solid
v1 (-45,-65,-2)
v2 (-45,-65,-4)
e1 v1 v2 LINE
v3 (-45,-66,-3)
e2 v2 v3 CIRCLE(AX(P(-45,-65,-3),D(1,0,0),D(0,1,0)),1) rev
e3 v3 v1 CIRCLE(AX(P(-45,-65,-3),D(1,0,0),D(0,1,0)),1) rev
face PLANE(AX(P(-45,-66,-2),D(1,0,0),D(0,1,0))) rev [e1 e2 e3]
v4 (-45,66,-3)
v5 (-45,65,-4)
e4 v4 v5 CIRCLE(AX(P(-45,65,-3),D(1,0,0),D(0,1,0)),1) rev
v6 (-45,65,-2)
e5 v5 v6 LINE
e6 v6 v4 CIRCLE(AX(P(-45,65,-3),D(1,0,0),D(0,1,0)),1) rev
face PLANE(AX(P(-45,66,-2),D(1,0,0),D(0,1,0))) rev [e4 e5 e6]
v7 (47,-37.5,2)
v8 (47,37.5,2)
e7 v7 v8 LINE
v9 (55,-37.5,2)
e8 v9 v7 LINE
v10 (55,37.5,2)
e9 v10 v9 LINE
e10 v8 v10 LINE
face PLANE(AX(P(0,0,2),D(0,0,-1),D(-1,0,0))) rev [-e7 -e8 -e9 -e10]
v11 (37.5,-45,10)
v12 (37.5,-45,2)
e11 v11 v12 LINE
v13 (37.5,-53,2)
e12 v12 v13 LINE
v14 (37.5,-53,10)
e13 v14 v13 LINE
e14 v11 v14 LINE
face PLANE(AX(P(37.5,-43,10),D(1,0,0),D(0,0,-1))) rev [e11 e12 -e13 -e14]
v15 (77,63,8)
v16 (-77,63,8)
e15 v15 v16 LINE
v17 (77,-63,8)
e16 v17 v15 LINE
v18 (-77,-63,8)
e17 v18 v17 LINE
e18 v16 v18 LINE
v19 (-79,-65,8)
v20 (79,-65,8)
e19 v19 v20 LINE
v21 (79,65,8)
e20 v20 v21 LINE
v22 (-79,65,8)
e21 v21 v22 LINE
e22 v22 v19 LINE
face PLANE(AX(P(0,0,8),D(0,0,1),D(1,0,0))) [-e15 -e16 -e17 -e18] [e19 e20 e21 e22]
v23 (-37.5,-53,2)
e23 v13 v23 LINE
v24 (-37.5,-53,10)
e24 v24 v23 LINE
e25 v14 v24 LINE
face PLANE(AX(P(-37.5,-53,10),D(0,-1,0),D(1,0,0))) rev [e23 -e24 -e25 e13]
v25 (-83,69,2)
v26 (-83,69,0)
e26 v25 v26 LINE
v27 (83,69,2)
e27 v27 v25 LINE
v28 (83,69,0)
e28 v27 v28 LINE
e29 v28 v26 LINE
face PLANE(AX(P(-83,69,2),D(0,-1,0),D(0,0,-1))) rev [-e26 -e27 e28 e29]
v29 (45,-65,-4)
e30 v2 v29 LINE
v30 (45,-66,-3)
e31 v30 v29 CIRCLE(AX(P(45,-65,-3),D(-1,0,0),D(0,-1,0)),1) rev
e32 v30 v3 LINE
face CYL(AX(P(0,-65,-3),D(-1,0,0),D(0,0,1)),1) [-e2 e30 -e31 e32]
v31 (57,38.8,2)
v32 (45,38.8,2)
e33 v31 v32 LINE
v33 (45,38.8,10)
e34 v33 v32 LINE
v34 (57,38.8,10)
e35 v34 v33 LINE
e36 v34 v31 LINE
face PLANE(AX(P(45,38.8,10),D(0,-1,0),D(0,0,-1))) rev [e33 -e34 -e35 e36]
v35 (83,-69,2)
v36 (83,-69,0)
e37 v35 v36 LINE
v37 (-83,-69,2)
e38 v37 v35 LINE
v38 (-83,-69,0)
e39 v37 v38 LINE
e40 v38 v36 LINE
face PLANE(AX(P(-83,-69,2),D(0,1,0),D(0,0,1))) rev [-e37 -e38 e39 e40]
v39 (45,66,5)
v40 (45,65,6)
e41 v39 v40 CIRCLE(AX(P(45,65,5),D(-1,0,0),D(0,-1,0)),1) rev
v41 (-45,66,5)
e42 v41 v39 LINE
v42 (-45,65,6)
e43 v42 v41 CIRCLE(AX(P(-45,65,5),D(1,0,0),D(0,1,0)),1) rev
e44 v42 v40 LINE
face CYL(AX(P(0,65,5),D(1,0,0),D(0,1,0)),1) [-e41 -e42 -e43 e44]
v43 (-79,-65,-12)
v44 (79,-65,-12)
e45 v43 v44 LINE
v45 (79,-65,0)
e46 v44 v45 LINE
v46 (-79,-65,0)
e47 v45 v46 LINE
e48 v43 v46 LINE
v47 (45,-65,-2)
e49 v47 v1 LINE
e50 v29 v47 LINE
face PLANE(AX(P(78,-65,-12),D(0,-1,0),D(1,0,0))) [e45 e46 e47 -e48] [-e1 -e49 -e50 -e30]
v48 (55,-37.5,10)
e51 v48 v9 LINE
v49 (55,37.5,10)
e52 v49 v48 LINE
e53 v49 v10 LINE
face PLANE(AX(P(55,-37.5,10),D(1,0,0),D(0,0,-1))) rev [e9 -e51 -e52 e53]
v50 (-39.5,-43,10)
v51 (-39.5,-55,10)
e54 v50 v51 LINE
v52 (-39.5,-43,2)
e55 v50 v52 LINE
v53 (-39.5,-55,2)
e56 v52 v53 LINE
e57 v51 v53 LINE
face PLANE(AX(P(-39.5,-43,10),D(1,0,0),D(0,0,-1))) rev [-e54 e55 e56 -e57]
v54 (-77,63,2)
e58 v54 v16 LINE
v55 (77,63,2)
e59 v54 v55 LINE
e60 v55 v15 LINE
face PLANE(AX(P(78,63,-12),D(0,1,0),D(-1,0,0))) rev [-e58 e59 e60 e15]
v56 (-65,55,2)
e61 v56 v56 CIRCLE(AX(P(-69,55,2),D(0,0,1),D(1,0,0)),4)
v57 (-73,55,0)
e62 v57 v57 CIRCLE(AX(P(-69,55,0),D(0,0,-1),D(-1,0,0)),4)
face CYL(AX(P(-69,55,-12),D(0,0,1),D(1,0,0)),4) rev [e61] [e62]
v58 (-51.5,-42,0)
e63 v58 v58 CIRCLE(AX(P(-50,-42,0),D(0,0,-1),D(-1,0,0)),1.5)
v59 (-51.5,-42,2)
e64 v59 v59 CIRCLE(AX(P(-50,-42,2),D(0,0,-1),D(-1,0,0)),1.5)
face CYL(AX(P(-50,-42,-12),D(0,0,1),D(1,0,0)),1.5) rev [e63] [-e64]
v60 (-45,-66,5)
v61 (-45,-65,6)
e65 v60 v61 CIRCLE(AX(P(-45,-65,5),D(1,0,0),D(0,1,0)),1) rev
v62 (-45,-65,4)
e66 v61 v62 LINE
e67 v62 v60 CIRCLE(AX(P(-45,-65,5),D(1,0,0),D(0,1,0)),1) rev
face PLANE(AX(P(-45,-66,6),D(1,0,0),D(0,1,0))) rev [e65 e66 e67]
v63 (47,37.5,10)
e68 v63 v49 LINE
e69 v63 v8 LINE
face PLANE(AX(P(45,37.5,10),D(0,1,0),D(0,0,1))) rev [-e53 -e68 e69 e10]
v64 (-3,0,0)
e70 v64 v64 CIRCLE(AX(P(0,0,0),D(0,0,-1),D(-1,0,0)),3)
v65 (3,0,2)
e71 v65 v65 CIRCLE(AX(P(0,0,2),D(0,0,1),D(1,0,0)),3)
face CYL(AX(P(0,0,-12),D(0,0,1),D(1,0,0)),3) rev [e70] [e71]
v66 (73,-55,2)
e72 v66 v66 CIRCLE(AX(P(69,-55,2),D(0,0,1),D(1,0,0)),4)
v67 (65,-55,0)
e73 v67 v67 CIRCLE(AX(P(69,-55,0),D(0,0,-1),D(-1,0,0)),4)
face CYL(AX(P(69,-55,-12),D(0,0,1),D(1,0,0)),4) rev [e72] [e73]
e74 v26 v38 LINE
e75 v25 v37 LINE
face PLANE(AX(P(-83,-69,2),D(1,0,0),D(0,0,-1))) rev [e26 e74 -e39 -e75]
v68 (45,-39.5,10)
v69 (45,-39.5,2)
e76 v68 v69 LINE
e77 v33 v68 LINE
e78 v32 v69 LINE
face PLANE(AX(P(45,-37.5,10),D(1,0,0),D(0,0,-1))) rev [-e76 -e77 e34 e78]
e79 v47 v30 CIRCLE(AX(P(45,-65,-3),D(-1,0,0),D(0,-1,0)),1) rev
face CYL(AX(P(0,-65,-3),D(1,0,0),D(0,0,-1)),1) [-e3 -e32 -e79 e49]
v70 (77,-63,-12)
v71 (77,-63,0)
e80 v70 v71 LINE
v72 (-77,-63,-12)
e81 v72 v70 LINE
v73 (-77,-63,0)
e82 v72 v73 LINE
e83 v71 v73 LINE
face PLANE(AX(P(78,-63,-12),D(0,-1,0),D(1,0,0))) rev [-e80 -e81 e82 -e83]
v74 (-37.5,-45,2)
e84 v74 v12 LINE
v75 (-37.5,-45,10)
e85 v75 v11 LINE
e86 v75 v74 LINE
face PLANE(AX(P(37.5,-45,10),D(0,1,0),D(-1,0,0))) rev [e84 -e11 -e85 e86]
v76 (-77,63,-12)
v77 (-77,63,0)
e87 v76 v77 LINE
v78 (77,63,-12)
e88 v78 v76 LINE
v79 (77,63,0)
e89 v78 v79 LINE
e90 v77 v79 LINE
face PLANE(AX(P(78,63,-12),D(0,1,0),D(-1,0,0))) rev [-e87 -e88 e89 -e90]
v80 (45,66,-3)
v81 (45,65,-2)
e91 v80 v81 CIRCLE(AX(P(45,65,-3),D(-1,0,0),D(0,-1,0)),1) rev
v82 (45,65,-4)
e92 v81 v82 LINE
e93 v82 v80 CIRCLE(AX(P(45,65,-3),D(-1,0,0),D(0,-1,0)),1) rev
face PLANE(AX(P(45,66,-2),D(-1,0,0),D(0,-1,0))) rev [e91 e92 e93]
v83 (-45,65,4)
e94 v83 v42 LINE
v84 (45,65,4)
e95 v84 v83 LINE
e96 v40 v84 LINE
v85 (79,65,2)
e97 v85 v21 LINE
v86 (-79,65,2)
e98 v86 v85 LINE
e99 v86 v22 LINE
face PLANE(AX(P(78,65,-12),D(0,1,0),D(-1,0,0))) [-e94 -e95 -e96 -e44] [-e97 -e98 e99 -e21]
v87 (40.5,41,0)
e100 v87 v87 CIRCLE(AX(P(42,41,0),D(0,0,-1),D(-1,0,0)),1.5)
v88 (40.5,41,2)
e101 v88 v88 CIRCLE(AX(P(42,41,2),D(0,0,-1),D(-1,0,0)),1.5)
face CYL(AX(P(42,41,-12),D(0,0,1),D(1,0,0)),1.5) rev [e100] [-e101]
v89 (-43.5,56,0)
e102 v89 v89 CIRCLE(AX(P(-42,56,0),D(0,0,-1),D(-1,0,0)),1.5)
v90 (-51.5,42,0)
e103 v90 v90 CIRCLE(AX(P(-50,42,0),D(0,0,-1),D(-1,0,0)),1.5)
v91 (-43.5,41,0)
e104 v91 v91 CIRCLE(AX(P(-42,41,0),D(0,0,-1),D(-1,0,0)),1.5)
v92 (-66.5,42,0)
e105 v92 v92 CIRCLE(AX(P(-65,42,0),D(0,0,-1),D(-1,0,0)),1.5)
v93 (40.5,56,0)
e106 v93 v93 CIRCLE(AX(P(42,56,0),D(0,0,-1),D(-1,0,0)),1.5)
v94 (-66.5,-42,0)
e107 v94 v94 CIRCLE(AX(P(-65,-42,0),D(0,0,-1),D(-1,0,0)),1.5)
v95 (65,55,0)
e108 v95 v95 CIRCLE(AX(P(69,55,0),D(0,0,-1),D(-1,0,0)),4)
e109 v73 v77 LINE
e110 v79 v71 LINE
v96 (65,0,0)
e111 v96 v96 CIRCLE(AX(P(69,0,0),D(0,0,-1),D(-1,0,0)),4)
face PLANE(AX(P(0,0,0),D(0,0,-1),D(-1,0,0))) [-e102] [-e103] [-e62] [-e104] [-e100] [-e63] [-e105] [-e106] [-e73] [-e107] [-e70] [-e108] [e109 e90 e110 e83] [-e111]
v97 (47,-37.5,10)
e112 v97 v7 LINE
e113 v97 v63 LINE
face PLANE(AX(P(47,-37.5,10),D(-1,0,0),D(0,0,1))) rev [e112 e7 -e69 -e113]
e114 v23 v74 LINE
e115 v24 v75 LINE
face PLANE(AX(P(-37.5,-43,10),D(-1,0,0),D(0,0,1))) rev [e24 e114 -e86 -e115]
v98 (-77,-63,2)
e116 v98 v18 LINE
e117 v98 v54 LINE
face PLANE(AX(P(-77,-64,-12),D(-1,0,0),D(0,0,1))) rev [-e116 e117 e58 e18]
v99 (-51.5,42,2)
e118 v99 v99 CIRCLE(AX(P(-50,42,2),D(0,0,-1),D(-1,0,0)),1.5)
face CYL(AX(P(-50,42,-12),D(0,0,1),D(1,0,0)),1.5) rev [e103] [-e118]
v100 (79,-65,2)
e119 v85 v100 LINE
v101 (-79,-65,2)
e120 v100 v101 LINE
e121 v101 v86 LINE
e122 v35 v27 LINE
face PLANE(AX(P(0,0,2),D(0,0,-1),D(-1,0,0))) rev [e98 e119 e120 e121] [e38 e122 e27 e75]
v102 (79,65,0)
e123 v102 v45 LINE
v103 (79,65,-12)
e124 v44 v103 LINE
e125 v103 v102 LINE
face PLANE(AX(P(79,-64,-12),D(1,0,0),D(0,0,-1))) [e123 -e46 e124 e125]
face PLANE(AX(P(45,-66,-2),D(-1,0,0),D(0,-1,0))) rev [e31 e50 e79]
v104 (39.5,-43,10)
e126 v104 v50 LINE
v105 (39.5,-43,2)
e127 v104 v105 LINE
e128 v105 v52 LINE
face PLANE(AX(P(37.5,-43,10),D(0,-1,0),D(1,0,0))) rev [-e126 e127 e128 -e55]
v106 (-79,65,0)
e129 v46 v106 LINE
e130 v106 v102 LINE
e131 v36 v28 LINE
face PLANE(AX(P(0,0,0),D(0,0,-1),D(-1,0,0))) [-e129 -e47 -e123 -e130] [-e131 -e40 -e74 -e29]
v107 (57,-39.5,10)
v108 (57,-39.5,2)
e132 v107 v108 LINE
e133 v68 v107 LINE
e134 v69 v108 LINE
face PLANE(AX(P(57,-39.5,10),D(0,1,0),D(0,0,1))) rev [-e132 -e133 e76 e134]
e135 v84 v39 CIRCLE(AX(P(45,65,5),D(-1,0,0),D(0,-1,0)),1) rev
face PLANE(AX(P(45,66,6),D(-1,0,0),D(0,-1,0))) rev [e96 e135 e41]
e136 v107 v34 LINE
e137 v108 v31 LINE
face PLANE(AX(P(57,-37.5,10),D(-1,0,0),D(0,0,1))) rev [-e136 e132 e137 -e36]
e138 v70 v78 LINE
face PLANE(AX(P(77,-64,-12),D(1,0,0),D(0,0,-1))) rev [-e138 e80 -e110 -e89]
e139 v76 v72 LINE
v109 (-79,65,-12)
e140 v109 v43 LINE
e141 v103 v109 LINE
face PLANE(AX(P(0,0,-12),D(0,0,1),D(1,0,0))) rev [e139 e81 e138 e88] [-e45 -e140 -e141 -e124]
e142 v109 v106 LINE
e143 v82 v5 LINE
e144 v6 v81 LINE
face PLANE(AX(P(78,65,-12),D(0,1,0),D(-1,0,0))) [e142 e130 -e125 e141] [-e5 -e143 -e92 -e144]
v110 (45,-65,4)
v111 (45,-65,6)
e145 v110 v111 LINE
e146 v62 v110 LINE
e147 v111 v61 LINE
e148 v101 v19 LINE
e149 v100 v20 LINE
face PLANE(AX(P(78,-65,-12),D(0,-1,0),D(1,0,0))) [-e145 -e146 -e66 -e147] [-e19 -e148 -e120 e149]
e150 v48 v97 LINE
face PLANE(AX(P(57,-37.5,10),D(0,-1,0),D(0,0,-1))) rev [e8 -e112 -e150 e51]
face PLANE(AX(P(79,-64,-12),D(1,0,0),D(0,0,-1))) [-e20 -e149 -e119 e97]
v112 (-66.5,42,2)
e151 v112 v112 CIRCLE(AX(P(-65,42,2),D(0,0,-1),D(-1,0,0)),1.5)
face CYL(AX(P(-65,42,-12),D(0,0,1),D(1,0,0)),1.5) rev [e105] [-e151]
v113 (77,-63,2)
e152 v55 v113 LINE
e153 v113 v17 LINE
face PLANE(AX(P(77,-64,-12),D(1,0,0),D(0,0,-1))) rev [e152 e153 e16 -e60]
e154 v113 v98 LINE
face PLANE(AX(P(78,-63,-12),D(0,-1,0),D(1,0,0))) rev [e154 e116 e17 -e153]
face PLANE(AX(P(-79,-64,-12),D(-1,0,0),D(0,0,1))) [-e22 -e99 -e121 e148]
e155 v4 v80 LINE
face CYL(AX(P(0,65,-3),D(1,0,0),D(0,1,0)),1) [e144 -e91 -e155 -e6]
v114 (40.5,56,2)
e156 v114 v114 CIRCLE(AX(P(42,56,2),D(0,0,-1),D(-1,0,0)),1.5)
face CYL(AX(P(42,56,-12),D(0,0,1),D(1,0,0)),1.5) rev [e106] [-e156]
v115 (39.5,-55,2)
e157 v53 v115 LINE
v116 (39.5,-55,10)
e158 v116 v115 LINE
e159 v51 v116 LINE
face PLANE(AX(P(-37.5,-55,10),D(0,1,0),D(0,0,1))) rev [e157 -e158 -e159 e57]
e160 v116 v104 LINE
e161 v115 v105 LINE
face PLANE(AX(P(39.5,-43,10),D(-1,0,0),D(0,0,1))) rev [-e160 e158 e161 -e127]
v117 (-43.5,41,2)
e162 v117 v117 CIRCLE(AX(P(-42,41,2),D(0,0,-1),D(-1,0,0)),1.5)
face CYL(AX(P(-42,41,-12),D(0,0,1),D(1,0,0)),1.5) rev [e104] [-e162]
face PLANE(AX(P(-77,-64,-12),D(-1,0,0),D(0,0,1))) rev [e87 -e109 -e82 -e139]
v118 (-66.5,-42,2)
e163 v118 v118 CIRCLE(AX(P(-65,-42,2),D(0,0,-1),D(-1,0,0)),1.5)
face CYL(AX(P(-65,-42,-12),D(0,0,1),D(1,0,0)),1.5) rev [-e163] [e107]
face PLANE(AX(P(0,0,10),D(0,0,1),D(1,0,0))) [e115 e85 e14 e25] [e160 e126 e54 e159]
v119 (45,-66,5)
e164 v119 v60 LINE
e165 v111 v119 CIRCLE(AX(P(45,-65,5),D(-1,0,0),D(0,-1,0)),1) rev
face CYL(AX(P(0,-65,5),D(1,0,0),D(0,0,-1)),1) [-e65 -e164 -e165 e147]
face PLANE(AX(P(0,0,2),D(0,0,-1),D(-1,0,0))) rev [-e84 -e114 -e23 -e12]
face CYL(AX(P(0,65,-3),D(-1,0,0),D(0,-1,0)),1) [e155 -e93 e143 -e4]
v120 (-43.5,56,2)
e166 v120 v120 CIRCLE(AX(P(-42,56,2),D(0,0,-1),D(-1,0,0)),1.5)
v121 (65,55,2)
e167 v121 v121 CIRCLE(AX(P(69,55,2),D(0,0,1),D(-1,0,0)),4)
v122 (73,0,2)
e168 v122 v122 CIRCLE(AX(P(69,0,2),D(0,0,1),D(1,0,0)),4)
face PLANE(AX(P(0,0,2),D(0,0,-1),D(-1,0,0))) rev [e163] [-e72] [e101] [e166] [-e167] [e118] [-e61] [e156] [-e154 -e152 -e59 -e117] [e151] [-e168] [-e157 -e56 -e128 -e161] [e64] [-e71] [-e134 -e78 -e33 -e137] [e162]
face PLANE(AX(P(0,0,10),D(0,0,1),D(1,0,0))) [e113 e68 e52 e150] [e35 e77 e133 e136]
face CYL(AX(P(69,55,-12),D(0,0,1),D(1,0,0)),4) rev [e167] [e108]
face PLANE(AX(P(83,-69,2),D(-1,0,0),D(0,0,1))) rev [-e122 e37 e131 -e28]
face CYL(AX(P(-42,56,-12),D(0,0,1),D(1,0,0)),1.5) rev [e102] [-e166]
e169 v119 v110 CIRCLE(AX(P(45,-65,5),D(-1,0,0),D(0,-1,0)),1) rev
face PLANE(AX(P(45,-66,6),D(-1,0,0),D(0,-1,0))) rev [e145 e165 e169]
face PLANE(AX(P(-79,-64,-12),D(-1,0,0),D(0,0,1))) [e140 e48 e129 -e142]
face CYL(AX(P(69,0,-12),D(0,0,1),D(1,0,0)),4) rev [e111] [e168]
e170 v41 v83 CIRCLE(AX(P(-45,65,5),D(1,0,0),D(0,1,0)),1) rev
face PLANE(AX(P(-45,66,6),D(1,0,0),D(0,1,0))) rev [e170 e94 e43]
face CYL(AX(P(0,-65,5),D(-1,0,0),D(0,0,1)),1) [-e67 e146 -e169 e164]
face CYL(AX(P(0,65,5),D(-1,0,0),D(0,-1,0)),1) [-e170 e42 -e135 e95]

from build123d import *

# Parameters (mm, degrees)
SKETCH_1_W                     = 166
SKETCH_1_H                     = 138
EXTRUDE_1_DEPTH                = 2
EXTRUDE_2_DEPTH                = 6
EXTRUDE_2_DEPTH_BACK           = 14
SKETCH_2_W                     = 158
SKETCH_2_H                     = 130
SKETCH_2_W_2                   = 154
SKETCH_2_H_2                   = 126
SKETCH_3_R                     = 1.5
EXTRUDE_2_2_DEPTH              = 5
SKETCH_5_R                     = 1.5
EXTRUDE_3_DEPTH                = 5
SKETCH_4_R                     = 1.5
EXTRUDE_4_DEPTH                = 5
SKETCH_6_W                     = 75
SKETCH_6_H                     = 2
SKETCH_6_W_2                   = 2
SKETCH_6_H_2                   = 75
EXTRUDE_5_DEPTH                = 8
SKETCH_9_W                     = 90
SKETCH_9_H                     = 2
EXTRUDE_6_DEPTH                = 1
FILLET_1_R                     = 1
SKETCH_11_W                    = 90
SKETCH_11_H                    = 2
EXTRUDE_7_DEPTH                = 1
FILLET_2_R                     = 1
PATTERN_LINEAR_1_COUNT         = 2
PATTERN_LINEAR_1_PITCH         = 8
FILLET_1_OF_PATTERN_LINEAR_1_R = 1
PATTERN_LINEAR_2_COUNT         = 2
PATTERN_LINEAR_2_PITCH         = 8
FILLET_2_OF_PATTERN_LINEAR_2_R = 1
SKETCH_12_W                    = 2
SKETCH_12_H                    = 12
SKETCH_12_W_2                  = 12
SKETCH_12_H_2                  = 2
SKETCH_12_H_3                  = 1.3
EXTRUDE_8_DEPTH                = 8
CUT_EXTRUDE_2_DEPTH            = 109.839331126
CUT_EXTRUDE_2_DEPTH_BACK       = 109.839331126
SKETCH_5_4_R                   = 1.5
CUT_EXTRUDE_3_DEPTH            = 109.839331126
CUT_EXTRUDE_3_DEPTH_BACK       = 109.839331126
SKETCH_4_3_R                   = 1.5
CUT_EXTRUDE_4_DEPTH            = 109.839331126
CUT_EXTRUDE_4_DEPTH_BACK       = 109.839331126
SKETCH_3_2_R                   = 1.5
SKETCH_13_R                    = 3
SKETCH_13_R_2                  = 4
CUT_EXTRUDE_5_DEPTH            = 109.839331126


with BuildPart() as part:
    # 스케치1 → 보스-돌출1 (new body)
    with BuildSketch(Plane.XY):
        Rectangle(SKETCH_1_W, SKETCH_1_H)
    extrude(amount=EXTRUDE_1_DEPTH)

    # 스케치2 → Extrude 2 (add, two sides: drawn at the far end of the back side and taken through both)
    with BuildSketch(Plane.XY.offset(2).offset(-EXTRUDE_2_DEPTH_BACK)):
        Rectangle(SKETCH_2_W, SKETCH_2_H)
        Rectangle(SKETCH_2_W_2, SKETCH_2_H_2, mode=Mode.SUBTRACT)
    extrude(amount=EXTRUDE_2_DEPTH + EXTRUDE_2_DEPTH_BACK)

    # 스케치3 → Extrude 2 2 (add)
    with BuildSketch(Plane.XY.offset(2)):
        with Locations(Location((-65, -42, 0), (0, 0, 180))):
            Circle(SKETCH_3_R)
        with Locations(Location((-50, -42, 0), (0, 0, 180))):
            Circle(SKETCH_3_R)
        with Locations(Location((-65, 42, 0), (0, 0, 180))):
            Circle(SKETCH_3_R)
        with Locations(Location((-50, 42, 0), (0, 0, 180))):
            Circle(SKETCH_3_R)
    extrude(amount=EXTRUDE_2_2_DEPTH)

    # 스케치5 → 보스-돌출3 (add)
    with BuildSketch(Plane.XY.offset(2)):
        with Locations(Location((42, 56, 0), (0, 0, 180))):
            Circle(SKETCH_5_R)
        with Locations(Location((42, 41, 0), (0, 0, 180))):
            Circle(SKETCH_5_R)
    extrude(amount=EXTRUDE_3_DEPTH)

    # 스케치4 → 보스-돌출4 (add)
    with BuildSketch(Plane.XY.offset(2)):
        with Locations(Location((-42, 56, 0), (0, 0, 180))):
            Circle(SKETCH_4_R)
        with Locations(Location((-42, 41, 0), (0, 0, 180))):
            Circle(SKETCH_4_R)
    extrude(amount=EXTRUDE_4_DEPTH)

    # 스케치6 → 보스-돌출5 (add)
    with BuildSketch(Plane.XY.offset(2)):
        with Locations((0, -54)):
            Rectangle(SKETCH_6_W, SKETCH_6_H)
        with Locations((0, -44)):
            Rectangle(SKETCH_6_W, SKETCH_6_H)
        with Locations((46, 0)):
            Rectangle(SKETCH_6_W_2, SKETCH_6_H_2)
        with Locations((56, 0)):
            Rectangle(SKETCH_6_W_2, SKETCH_6_H_2)
    extrude(amount=EXTRUDE_5_DEPTH)

    # 스케치9 → 보스-돌출6 (add)
    with BuildSketch(Plane.XZ.offset(65)):
        with Locations((0, 5)):
            Rectangle(SKETCH_9_W, SKETCH_9_H)
    extrude_6 = extrude(amount=EXTRUDE_6_DEPTH)

    # 필렛1
    fillet_1_edges = [part.edges().sort_by_distance(p)[0] for p in [
        (0, -66, 4),
        (0, -66, 6),
    ]]
    fillet(fillet_1_edges, radius=FILLET_1_R - 0.0001)  # a hair under: the kernel refuses the full size

    # 스케치11 → 보스-돌출7 (add)
    with BuildSketch(Plane(origin=(0, 65, 0), x_dir=(1, 0, 0), z_dir=(0, 1, 0))):
        with Locations((0, -5)):
            Rectangle(SKETCH_11_W, SKETCH_11_H)
    extrude_7 = extrude(amount=EXTRUDE_7_DEPTH)

    # 필렛2
    fillet_2_edges = [part.edges().sort_by_distance(p)[0] for p in [
        (0, 66, 4),
        (0, 66, 6),
    ]]
    fillet(fillet_2_edges, radius=FILLET_2_R - 0.0001)  # a hair under: the kernel refuses the full size

    # 선형 패턴1: 보스-돌출6 ×2
    with Locations(*[(0, 0, -i * PATTERN_LINEAR_1_PITCH) for i in range(1, PATTERN_LINEAR_1_COUNT)]):
        add(extrude_6)

    # 필렛1 of 선형 패턴1
    fillet_1_of_pattern_linear_1_edges = [part.edges().sort_by_distance(p)[0] for p in [
        (0, -66, -4),
        (0, -66, -2),
    ]]
    fillet(fillet_1_of_pattern_linear_1_edges, radius=FILLET_1_OF_PATTERN_LINEAR_1_R - 0.0001)  # a hair under: the kernel refuses the full size

    # 선형 패턴2: 보스-돌출7 ×2
    with Locations(*[(0, 0, -i * PATTERN_LINEAR_2_PITCH) for i in range(1, PATTERN_LINEAR_2_COUNT)]):
        add(extrude_7)

    # 필렛2 of 선형 패턴2
    fillet_2_of_pattern_linear_2_edges = [part.edges().sort_by_distance(p)[0] for p in [
        (0, 66, -4),
        (0, 66, -2),
    ]]
    fillet(fillet_2_of_pattern_linear_2_edges, radius=FILLET_2_OF_PATTERN_LINEAR_2_R - 0.0001)  # a hair under: the kernel refuses the full size

    # 스케치12 → 보스-돌출8 (add)
    with BuildSketch(Plane.XY.offset(2)):
        with Locations((-38.5, -49)):
            Rectangle(SKETCH_12_W, SKETCH_12_H)
        with Locations((38.5, -49)):
            Rectangle(SKETCH_12_W, SKETCH_12_H)
        with Locations((51, -38.5)):
            Rectangle(SKETCH_12_W_2, SKETCH_12_H_2)
        with Locations((51, 38.15)):
            Rectangle(SKETCH_12_W_2, SKETCH_12_H_3)
    extrude(amount=EXTRUDE_8_DEPTH)

    # 스케치5<4> → 컷-돌출2 (cut, two sides: drawn at the far end of the back side and taken through both)
    with BuildSketch(Plane.XY.offset(2).offset(-CUT_EXTRUDE_2_DEPTH_BACK)):
        with Locations(Location((42, 56, 0), (0, 0, 180))):
            Circle(SKETCH_5_4_R)
        with Locations(Location((42, 41, 0), (0, 0, 180))):
            Circle(SKETCH_5_4_R)
    extrude(amount=CUT_EXTRUDE_2_DEPTH + CUT_EXTRUDE_2_DEPTH_BACK, mode=Mode.SUBTRACT)

    # 스케치4<3> → 컷-돌출3 (cut, two sides: drawn at the far end of the back side and taken through both)
    with BuildSketch(Plane.XY.offset(2).offset(-CUT_EXTRUDE_3_DEPTH_BACK)):
        with Locations(Location((-42, 56, 0), (0, 0, 180))):
            Circle(SKETCH_4_3_R)
        with Locations(Location((-42, 41, 0), (0, 0, 180))):
            Circle(SKETCH_4_3_R)
    extrude(amount=CUT_EXTRUDE_3_DEPTH + CUT_EXTRUDE_3_DEPTH_BACK, mode=Mode.SUBTRACT)

    # 스케치3<2> → 컷-돌출4 (cut, two sides: drawn at the far end of the back side and taken through both)
    with BuildSketch(Plane.XY.offset(2).offset(-CUT_EXTRUDE_4_DEPTH_BACK)):
        with Locations(Location((-65, -42, 0), (0, 0, 180))):
            Circle(SKETCH_3_2_R)
        with Locations(Location((-50, -42, 0), (0, 0, 180))):
            Circle(SKETCH_3_2_R)
        with Locations(Location((-65, 42, 0), (0, 0, 180))):
            Circle(SKETCH_3_2_R)
        with Locations(Location((-50, 42, 0), (0, 0, 180))):
            Circle(SKETCH_3_2_R)
    extrude(amount=CUT_EXTRUDE_4_DEPTH + CUT_EXTRUDE_4_DEPTH_BACK, mode=Mode.SUBTRACT)

    # 스케치13 → 컷-돌출5 (cut, through all)
    with BuildSketch(Plane.XY.offset(2)):
        Circle(SKETCH_13_R)
        with Locations((-69, 55)):
            Circle(SKETCH_13_R_2)
        with Locations(Location((69, 55, 0), (0, 0, 180))):
            Circle(SKETCH_13_R_2)
        with Locations((69, -55)):
            Circle(SKETCH_13_R_2)
        with Locations((69, 0)):
            Circle(SKETCH_13_R_2)
    extrude(amount=-CUT_EXTRUDE_5_DEPTH, mode=Mode.SUBTRACT)


solid = part.part
